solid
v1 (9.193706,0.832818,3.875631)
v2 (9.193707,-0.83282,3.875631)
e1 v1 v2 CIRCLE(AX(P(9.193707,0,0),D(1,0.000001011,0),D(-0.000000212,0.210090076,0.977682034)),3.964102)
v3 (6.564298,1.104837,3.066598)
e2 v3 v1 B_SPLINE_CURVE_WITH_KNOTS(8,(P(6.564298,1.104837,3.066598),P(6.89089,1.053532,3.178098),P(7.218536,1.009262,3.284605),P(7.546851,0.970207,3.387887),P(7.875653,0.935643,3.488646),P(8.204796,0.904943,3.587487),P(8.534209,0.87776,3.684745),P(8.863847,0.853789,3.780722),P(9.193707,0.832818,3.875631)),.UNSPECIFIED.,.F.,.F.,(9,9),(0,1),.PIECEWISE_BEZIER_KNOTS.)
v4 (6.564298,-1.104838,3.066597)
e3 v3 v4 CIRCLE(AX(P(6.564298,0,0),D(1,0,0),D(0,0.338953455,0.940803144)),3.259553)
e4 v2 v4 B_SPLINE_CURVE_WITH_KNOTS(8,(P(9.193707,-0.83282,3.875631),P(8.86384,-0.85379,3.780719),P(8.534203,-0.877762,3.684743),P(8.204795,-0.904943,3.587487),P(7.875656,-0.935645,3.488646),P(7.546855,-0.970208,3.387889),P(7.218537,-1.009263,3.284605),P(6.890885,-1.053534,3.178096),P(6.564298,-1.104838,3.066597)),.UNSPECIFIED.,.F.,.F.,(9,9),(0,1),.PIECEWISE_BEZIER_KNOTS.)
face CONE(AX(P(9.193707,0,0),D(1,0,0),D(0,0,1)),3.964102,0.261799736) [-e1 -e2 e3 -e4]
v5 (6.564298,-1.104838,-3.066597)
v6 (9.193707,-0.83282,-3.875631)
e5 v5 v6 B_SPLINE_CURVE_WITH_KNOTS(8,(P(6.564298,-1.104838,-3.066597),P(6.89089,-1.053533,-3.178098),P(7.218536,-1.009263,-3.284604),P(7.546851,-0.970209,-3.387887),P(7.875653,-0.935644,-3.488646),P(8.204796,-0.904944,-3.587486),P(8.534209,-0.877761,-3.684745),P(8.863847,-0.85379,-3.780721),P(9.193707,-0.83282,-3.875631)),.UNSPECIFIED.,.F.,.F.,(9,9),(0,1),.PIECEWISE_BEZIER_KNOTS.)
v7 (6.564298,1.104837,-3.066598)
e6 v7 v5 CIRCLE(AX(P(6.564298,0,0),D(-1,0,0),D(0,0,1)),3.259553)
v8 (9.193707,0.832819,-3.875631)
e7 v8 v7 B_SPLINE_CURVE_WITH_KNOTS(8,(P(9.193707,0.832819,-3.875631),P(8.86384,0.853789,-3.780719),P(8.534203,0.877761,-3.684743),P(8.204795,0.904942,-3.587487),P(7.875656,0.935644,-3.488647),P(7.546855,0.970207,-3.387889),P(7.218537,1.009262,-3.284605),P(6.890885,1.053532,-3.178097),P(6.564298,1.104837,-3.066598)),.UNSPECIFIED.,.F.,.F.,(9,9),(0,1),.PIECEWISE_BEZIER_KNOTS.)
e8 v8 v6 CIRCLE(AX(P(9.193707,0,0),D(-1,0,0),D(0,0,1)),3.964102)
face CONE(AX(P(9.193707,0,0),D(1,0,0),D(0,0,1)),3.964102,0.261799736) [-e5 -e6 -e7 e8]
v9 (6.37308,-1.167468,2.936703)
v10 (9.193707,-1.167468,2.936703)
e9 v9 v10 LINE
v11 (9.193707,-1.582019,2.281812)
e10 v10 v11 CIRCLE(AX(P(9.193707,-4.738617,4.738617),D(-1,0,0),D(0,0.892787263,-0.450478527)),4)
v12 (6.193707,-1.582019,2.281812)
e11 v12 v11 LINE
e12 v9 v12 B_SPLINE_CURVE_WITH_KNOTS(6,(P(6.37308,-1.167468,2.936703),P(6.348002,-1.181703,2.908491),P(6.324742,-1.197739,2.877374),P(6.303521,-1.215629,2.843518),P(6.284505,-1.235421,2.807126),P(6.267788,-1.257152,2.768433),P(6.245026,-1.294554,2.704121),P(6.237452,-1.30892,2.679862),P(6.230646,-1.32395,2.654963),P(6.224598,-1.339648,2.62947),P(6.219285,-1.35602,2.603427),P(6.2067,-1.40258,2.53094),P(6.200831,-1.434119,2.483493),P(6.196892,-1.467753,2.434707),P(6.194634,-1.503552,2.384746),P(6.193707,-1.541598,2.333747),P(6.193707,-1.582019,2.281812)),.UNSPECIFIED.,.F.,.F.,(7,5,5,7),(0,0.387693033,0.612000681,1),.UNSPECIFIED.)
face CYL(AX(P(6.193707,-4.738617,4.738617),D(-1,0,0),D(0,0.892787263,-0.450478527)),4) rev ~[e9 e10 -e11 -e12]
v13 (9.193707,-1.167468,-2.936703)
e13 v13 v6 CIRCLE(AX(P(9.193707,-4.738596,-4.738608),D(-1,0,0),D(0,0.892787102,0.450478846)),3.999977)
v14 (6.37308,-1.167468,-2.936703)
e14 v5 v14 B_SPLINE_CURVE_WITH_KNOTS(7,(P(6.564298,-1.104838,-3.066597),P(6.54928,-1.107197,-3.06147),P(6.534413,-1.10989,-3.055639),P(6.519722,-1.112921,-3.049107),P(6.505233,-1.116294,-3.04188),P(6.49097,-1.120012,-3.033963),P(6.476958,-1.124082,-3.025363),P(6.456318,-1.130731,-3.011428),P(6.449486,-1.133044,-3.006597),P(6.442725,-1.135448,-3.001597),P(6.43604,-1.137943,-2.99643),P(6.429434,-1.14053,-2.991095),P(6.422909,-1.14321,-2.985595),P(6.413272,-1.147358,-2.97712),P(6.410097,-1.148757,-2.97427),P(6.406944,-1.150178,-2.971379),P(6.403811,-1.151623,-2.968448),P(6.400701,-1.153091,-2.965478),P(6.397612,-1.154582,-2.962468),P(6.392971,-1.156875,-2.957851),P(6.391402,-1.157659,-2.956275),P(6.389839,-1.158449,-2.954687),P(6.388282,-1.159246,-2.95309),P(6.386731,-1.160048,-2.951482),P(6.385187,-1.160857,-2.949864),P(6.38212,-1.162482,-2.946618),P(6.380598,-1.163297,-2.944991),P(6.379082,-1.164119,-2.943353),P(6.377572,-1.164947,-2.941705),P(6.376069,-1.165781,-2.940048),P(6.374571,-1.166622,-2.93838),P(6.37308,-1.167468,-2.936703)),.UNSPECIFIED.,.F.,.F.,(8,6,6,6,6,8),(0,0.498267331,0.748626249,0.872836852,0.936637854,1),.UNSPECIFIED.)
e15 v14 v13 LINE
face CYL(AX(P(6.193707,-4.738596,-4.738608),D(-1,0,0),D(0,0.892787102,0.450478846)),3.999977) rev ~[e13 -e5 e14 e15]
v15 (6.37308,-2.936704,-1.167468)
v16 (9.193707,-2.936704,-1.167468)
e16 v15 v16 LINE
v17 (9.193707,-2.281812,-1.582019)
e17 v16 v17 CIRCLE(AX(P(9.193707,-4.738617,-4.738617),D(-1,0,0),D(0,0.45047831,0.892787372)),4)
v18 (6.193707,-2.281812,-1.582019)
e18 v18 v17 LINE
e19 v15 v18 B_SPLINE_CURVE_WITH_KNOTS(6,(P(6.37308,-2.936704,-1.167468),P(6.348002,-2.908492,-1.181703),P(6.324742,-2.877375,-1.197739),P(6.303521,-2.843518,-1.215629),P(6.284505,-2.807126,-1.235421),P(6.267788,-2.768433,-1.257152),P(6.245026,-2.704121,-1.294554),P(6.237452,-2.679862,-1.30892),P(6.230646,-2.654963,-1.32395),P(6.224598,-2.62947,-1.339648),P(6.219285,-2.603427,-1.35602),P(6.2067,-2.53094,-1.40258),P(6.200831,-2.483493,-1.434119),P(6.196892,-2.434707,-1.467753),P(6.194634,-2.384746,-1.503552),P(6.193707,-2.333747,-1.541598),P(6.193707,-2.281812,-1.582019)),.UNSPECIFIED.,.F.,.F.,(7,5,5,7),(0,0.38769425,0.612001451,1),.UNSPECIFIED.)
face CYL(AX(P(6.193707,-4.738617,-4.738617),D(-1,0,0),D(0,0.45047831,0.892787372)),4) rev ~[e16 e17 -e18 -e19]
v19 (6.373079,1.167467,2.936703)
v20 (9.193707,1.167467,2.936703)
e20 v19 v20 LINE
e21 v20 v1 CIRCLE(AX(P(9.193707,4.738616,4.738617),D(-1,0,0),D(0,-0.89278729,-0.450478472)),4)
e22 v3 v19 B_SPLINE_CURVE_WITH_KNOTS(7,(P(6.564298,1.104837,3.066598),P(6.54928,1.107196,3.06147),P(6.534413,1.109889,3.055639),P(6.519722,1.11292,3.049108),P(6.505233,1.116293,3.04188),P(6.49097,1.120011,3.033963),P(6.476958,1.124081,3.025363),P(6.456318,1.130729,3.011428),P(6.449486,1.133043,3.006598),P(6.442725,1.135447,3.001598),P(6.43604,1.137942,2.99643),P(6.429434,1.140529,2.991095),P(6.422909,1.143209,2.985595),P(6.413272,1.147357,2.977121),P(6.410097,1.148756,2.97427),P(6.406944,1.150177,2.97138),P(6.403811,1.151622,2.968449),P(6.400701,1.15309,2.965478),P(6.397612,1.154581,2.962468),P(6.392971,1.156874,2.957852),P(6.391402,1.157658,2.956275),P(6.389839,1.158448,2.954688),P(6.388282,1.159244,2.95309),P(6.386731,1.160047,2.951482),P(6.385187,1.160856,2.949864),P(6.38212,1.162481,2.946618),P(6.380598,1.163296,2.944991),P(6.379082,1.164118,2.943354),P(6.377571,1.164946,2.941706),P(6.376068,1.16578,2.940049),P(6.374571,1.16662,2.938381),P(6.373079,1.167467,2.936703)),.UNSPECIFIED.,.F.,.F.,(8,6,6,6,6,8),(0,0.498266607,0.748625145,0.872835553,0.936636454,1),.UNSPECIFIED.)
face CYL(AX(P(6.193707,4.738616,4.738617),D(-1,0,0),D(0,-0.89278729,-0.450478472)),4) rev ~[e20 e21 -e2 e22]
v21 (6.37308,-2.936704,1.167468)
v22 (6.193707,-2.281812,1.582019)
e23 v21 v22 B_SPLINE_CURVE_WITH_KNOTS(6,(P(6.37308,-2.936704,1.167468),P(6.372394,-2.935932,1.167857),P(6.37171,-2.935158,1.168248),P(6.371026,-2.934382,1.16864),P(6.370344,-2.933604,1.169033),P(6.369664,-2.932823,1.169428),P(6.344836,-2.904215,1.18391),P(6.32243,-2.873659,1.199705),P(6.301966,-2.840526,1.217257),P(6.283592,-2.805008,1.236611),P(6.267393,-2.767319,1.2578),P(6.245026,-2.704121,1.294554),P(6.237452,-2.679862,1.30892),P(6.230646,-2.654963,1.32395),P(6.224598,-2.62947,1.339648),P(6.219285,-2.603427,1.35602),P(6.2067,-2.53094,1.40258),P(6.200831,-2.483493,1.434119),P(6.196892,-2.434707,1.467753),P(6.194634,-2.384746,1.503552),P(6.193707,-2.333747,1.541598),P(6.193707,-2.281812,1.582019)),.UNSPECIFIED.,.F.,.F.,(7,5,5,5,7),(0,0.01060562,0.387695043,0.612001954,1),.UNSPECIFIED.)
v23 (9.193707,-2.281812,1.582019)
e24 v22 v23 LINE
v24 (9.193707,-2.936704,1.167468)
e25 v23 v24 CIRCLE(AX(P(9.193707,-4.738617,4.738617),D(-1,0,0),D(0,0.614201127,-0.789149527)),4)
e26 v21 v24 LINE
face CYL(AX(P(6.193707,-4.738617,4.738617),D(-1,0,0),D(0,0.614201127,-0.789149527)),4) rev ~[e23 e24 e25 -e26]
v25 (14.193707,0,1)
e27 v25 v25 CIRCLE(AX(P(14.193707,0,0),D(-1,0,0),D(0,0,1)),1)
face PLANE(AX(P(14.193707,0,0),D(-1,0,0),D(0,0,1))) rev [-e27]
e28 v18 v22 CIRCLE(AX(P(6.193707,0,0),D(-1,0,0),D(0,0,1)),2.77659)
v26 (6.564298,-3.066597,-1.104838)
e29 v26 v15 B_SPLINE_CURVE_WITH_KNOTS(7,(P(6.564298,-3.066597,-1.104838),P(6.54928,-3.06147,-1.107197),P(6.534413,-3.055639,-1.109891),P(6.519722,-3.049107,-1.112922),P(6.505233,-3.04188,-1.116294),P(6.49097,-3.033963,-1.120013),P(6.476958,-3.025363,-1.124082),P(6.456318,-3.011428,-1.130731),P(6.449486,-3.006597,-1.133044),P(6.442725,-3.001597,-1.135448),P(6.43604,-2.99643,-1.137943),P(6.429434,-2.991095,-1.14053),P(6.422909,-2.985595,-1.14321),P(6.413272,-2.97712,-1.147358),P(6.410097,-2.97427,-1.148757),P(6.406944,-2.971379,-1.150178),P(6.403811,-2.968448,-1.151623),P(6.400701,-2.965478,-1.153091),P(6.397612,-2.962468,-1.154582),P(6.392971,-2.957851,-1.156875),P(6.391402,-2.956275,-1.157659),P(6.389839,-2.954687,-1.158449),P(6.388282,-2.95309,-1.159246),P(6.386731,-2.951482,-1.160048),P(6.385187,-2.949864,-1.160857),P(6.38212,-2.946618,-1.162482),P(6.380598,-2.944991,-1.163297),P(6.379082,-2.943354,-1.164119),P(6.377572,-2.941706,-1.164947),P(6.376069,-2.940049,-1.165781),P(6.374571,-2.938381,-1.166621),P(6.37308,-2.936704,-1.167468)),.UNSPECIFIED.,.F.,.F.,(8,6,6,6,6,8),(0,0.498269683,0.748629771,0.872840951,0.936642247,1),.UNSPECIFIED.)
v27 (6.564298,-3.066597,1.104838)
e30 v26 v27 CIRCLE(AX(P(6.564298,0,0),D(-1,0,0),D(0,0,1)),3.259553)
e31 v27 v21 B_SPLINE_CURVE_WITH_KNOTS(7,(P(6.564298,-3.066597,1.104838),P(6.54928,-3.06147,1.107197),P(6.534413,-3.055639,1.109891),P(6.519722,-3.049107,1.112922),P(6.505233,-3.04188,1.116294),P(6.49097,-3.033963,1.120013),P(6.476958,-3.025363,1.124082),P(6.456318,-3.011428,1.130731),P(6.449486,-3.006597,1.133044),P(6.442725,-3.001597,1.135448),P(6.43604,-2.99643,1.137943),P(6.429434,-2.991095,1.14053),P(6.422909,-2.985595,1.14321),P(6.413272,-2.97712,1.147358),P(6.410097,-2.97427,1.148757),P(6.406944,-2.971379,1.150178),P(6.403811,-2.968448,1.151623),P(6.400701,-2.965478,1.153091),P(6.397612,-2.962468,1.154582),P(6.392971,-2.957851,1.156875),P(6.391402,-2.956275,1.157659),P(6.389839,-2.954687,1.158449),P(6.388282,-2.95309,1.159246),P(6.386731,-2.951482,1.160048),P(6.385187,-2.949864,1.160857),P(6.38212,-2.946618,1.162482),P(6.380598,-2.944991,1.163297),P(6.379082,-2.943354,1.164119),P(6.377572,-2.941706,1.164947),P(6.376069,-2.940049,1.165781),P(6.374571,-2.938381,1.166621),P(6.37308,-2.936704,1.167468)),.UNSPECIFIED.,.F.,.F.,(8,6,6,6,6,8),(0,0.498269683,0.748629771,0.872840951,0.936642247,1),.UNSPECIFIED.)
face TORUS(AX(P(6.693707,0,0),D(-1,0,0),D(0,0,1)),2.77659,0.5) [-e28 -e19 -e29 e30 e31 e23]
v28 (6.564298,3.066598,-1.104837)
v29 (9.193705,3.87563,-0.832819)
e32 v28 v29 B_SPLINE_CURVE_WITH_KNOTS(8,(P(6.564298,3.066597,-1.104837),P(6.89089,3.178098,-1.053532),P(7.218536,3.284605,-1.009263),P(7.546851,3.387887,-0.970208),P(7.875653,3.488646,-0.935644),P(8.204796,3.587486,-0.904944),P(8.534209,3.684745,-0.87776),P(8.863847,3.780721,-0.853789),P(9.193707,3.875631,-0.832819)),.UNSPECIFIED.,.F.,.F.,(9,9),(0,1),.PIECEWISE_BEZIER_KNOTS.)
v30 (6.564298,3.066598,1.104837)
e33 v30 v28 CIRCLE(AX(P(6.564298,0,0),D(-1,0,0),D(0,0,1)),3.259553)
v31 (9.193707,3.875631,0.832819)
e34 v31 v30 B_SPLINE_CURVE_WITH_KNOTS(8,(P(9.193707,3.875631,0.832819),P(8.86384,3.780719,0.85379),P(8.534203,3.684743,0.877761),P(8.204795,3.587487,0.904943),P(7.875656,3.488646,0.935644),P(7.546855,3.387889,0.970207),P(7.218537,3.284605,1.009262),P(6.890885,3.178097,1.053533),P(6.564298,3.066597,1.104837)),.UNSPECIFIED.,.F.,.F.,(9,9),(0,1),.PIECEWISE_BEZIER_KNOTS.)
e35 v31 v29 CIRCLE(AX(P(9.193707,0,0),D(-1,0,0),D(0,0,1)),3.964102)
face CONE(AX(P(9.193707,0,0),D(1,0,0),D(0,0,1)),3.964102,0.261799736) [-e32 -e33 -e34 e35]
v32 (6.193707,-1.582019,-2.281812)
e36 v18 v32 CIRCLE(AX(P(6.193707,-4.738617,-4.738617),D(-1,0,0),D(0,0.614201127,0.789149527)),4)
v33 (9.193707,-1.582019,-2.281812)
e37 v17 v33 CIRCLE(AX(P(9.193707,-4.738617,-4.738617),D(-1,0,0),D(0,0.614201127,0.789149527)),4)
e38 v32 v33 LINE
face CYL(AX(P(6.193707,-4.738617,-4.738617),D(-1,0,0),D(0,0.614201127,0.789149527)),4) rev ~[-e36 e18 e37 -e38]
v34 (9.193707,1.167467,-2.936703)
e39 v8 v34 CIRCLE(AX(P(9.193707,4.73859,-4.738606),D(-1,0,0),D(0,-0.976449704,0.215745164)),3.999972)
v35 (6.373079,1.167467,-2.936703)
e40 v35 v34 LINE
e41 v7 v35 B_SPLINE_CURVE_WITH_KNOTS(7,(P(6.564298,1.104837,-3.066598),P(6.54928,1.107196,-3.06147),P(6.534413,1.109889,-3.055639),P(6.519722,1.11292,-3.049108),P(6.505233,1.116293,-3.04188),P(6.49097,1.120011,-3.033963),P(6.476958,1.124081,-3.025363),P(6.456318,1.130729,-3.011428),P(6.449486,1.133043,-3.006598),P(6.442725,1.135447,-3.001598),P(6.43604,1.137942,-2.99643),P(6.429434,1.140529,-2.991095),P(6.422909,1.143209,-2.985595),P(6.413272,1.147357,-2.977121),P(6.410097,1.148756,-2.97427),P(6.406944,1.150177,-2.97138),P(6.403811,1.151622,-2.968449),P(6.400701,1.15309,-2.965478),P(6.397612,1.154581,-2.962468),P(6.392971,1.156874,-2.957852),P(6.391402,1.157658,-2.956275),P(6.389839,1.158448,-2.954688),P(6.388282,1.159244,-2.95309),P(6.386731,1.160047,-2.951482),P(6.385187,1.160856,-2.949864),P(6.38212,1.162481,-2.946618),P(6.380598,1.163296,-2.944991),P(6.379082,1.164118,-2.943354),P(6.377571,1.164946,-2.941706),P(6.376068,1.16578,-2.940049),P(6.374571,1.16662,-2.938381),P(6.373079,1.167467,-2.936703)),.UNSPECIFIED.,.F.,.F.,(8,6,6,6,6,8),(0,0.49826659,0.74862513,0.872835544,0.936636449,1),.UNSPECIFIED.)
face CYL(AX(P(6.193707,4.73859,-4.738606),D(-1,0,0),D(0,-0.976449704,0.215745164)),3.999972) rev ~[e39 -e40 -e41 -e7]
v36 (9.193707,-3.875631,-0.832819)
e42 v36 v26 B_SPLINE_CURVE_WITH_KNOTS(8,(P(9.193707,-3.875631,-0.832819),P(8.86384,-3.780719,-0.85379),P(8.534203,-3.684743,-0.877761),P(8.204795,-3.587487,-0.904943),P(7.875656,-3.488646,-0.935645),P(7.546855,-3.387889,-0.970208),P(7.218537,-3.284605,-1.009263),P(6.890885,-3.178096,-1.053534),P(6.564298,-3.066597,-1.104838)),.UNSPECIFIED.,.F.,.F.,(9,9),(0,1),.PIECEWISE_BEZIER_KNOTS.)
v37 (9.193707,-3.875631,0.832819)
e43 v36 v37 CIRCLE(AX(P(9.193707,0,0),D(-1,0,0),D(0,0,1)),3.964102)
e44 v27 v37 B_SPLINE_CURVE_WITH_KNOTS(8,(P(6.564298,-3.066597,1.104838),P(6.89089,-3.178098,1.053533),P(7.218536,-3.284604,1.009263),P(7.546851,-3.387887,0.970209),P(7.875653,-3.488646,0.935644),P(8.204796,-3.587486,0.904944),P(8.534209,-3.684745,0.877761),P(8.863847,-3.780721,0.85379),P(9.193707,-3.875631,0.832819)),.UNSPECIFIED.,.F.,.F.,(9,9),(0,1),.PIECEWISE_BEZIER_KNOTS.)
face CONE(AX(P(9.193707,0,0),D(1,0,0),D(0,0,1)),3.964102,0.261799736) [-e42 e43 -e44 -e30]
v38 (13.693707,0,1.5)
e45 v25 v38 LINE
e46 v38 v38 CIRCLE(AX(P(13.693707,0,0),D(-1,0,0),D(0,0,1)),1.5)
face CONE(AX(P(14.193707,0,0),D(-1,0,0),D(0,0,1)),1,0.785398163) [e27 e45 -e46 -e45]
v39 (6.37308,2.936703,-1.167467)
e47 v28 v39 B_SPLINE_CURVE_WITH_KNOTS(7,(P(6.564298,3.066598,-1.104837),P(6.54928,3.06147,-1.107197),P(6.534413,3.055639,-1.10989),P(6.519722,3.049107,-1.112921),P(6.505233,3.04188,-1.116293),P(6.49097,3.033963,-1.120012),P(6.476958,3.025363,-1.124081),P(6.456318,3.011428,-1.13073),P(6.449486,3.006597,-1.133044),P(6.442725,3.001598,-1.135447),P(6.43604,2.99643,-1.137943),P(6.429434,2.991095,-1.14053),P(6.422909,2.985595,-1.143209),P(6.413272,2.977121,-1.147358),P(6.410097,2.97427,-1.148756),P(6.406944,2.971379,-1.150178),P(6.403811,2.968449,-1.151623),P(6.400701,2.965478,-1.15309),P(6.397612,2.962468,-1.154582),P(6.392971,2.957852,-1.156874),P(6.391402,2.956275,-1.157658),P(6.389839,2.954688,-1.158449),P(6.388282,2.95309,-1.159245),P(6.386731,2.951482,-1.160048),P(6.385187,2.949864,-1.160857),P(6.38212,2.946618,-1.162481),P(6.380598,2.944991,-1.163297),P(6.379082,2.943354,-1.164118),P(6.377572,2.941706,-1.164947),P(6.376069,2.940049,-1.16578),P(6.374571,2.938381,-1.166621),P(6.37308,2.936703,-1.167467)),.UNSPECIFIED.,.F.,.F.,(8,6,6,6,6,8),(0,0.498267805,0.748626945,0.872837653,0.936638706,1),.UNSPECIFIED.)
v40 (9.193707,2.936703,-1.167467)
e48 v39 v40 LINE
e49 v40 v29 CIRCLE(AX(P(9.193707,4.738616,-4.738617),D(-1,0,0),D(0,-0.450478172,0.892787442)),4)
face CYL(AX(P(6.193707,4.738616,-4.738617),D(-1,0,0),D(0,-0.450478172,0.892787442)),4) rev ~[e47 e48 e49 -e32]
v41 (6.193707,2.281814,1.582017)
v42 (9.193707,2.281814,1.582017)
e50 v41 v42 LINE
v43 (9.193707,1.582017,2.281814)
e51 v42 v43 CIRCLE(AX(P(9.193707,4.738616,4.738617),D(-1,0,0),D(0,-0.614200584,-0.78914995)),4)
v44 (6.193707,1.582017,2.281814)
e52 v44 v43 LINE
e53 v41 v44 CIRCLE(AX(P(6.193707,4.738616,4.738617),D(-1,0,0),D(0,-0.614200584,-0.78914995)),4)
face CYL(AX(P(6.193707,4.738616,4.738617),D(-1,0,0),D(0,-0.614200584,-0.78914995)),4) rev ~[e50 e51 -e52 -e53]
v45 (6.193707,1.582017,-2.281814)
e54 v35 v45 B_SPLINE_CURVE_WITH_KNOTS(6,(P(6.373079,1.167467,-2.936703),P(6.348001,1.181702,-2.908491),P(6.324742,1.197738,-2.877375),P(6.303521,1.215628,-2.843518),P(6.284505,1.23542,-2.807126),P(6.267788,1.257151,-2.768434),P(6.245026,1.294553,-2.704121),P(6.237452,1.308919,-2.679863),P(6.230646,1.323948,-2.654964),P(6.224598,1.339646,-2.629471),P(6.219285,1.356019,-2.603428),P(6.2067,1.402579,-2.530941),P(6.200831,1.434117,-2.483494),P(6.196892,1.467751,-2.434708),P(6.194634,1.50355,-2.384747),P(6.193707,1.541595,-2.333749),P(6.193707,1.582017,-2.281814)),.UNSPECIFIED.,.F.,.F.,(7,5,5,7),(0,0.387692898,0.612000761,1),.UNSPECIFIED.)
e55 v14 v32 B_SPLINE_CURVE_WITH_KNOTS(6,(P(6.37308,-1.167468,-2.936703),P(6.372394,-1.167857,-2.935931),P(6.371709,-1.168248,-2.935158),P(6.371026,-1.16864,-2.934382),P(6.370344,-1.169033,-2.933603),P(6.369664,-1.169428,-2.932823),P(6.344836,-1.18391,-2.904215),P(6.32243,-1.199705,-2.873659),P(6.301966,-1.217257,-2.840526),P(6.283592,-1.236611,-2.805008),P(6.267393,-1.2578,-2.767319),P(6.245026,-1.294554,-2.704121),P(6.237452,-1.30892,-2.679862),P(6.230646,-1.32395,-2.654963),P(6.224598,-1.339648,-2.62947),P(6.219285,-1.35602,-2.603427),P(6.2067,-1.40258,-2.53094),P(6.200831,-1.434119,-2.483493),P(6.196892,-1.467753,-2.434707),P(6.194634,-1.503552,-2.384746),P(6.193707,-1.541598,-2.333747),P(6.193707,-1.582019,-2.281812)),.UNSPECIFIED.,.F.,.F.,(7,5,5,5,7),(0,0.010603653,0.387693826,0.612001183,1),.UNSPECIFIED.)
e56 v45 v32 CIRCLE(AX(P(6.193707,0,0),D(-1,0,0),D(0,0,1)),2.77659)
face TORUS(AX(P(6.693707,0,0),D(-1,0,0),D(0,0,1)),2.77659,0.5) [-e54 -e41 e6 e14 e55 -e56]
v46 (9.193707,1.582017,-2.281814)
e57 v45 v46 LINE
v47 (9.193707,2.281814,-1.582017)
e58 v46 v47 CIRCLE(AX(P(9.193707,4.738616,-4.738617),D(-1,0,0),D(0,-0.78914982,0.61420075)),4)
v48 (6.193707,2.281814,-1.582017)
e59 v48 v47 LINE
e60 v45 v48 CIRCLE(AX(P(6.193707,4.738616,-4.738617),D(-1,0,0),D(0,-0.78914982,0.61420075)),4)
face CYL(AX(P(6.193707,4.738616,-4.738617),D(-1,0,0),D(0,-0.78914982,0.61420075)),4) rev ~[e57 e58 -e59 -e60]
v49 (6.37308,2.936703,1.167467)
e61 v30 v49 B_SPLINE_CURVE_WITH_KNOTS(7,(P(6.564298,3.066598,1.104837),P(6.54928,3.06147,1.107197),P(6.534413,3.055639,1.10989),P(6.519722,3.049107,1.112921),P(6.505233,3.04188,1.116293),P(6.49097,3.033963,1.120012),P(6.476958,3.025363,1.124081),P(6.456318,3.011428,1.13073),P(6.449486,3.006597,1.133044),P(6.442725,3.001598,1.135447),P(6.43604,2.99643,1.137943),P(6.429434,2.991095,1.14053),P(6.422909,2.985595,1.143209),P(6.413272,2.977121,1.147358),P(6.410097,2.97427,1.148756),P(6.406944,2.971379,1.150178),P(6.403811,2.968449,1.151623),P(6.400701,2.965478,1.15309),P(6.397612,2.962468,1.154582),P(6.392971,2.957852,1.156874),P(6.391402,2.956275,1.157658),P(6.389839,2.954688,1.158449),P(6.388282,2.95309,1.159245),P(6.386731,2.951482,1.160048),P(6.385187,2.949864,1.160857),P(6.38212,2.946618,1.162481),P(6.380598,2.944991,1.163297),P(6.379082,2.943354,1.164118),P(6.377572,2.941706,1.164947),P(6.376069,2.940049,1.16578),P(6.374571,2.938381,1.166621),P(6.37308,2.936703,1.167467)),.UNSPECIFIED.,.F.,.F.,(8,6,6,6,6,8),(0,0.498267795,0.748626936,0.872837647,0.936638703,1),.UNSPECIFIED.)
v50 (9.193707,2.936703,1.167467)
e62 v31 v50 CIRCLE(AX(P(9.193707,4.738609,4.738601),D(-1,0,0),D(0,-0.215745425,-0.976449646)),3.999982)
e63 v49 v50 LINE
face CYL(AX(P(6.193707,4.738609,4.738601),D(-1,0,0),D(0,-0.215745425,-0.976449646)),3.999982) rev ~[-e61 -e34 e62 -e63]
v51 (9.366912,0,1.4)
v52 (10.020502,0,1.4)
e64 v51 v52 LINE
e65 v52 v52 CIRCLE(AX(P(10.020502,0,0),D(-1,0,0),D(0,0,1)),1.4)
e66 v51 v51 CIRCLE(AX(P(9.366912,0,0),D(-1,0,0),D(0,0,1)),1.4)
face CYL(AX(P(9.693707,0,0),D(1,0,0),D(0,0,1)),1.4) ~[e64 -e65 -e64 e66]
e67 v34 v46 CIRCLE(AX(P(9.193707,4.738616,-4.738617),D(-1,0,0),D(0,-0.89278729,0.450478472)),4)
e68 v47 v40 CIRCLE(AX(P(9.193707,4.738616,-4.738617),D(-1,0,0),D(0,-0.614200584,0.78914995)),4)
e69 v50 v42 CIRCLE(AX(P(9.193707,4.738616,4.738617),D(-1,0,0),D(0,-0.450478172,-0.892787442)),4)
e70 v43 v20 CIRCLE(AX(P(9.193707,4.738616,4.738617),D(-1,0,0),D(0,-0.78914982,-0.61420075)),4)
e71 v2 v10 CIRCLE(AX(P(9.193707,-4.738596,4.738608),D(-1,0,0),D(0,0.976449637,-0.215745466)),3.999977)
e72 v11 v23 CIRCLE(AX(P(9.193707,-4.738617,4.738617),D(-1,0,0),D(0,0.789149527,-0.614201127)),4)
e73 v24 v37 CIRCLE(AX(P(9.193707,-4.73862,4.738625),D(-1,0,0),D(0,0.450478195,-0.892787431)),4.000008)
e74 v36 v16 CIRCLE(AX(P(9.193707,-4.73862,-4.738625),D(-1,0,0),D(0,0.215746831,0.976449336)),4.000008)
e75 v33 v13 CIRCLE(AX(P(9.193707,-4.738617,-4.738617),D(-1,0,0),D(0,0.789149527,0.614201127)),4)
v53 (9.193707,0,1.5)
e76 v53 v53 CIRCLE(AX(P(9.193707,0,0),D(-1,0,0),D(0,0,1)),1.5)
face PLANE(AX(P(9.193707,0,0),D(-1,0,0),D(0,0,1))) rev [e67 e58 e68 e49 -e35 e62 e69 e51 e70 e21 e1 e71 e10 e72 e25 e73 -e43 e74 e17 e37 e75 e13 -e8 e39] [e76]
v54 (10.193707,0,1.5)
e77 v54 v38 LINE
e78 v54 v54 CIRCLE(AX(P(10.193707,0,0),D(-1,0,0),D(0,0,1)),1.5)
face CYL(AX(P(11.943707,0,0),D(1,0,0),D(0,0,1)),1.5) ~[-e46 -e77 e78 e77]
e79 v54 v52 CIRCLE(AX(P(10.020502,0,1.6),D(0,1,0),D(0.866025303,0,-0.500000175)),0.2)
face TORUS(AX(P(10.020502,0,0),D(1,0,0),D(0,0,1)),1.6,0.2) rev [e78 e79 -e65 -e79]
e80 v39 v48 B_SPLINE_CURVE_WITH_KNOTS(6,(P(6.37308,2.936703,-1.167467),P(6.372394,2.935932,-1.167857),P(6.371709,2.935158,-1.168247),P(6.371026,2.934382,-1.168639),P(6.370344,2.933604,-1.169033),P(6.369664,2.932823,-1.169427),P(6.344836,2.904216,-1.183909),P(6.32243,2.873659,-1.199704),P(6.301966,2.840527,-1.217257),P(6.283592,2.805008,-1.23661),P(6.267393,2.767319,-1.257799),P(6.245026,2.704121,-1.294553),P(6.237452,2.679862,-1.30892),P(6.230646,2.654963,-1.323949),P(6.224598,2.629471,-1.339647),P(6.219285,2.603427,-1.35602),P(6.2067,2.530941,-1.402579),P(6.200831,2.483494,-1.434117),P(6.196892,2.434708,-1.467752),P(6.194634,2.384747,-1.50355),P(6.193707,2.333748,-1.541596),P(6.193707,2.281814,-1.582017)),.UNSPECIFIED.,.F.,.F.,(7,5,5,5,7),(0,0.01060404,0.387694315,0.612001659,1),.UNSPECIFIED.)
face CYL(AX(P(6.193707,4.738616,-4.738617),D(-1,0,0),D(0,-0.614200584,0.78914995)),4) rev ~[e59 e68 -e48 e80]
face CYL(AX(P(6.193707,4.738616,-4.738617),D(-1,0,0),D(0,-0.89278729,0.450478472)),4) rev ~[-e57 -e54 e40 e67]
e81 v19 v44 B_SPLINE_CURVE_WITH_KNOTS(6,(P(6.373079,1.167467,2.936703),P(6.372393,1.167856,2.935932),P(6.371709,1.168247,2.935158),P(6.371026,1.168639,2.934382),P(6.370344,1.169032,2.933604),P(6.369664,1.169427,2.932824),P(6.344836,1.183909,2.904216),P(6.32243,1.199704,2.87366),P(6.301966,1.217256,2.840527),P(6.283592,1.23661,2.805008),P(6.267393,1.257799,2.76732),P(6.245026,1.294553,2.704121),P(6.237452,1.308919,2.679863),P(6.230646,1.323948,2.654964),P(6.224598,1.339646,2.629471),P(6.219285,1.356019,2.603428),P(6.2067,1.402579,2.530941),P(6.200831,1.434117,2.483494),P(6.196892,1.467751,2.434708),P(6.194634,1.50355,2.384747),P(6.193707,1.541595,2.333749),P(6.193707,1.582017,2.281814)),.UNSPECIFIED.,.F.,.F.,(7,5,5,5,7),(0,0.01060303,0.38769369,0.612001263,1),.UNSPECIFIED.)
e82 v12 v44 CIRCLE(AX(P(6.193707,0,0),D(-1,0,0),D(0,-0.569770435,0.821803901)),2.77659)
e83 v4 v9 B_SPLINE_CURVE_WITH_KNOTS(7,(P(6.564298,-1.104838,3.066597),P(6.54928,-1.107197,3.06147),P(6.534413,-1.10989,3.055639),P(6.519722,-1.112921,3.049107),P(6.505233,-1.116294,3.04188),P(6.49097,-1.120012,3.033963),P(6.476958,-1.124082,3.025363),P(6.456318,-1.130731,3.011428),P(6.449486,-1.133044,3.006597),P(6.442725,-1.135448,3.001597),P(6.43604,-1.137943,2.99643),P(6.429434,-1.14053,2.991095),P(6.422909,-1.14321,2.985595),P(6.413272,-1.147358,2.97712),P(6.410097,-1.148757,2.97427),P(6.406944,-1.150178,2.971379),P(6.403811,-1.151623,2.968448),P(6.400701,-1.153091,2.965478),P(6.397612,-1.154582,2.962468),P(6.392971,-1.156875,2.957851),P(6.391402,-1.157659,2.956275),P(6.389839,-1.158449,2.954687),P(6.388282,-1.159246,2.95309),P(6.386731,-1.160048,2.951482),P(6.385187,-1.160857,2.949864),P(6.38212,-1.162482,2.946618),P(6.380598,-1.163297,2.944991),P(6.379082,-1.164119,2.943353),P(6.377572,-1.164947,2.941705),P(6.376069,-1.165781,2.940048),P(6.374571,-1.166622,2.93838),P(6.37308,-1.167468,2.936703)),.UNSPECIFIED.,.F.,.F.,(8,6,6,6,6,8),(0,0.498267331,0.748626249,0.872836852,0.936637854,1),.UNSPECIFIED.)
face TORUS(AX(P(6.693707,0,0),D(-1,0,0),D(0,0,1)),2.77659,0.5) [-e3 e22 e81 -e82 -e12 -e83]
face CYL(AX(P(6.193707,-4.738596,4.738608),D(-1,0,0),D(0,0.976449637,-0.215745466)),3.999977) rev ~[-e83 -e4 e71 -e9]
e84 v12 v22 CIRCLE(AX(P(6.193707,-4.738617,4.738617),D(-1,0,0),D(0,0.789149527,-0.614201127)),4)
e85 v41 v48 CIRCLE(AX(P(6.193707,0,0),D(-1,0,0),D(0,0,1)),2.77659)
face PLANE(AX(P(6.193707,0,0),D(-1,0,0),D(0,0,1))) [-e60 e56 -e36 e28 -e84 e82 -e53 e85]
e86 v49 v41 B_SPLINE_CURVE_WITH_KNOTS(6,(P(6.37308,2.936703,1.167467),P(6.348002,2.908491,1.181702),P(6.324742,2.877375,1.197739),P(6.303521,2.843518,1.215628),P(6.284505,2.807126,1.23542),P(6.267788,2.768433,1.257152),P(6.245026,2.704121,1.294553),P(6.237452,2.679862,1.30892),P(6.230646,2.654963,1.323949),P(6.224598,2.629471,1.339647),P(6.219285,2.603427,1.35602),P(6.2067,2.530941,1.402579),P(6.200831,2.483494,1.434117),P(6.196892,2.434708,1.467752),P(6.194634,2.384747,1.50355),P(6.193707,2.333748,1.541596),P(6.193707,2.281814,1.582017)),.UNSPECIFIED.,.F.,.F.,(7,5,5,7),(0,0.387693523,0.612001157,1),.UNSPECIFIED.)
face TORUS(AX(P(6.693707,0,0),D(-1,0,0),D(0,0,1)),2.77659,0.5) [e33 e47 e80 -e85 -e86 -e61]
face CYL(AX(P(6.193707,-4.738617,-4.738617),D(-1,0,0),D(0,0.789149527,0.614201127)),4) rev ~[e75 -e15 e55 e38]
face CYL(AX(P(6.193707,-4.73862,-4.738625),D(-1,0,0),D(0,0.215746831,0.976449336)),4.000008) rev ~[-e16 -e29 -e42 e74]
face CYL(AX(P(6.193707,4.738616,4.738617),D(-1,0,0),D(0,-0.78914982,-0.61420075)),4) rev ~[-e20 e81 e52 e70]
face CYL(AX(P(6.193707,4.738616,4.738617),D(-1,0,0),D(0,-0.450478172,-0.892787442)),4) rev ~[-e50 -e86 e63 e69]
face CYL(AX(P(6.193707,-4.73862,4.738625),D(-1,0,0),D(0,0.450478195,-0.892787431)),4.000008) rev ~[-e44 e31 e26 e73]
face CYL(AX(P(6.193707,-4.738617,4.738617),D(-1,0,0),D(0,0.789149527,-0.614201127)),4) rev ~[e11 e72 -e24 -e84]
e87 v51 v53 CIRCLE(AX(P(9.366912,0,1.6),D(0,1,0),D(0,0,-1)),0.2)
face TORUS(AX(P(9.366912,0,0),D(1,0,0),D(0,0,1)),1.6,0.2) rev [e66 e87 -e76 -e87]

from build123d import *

# Parameters (mm, degrees)
F0_W     = 0.65359
F0_H     = 1.4
F0_W_2   = 3.5
F0_H_2   = 1.5
F3_DEPTH = 25


# Not quite as in the source:
# - ends of sketch curves that miss each other by under 0.0002 mm in the source are joined


with BuildPart() as f1:
    # F0 (on Front) → F1 (revolve)
    with BuildSketch(Plane.XZ):
        with BuildLine():
            ThreePointArc((9.366912, 1.4), (9.2669120175, 1.4267949091), (9.1937069394, 1.499999965))
            Line((9.193707, 1.499999965), (9.193707, 0))
            Line((9.193707, 0), (9.366912, 0))
            Line((9.366912, 0), (9.366912, 1.4))
        make_face()
        with Locations((9.693707, 0.7)):
            Rectangle(F0_W, F0_H)
        with BuildLine():
            ThreePointArc((10.1937070606, 1.499999965), (10.1205019825, 1.4267949091), (10.020502, 1.4))
            Line((10.020502, 1.4), (10.020502, 0))
            Line((10.020502, 0), (10.193707, 0))
            Line((10.193707, 0), (10.193707, 1.5))
        make_face()
        with Locations((11.943707, 0.75)):
            Rectangle(F0_W_2, F0_H_2)
        Polygon((14.193707, 1), (13.693707, 1.5), (13.693707, 0), (14.193707, 0), align=None)
        with BuildLine():
            Line((9.193707, 3.964102), (6.564298, 3.259553))
            ThreePointArc((6.5642979867, 3.2595530496), (6.2970304903, 3.0809709236), (6.193707, 2.77659))
            Line((6.193707, 2.77659), (6.193707, 0))
            Line((6.193707, 0), (9.193707, 0))
            Line((9.193707, 0), (9.193707, 1.499999965))
            Line((9.193707, 1.499999965), (9.193707, 3.964102))
        make_face()
    revolve(axis=Axis((10.368707, 0, 0), (-1, 0, 0)))

    # F2 (on face) → F3 (cut)
    with BuildSketch(Plane(origin=(6.193707, 0, 0), x_dir=(0, -1, 0), z_dir=(-1, 0, 0))):
        with BuildLine():
            ThreePointArc((3.8756311548, 0.8328191991), (2.8030435942, 2.8030432168), (0.8328197209, 3.8756310427))
            ThreePointArc((0.8328197209, 3.8756310427), (0.9707821759, 3.3957019848), (1.1674679485, 2.9367028921))
            ThreePointArc((1.1674679485, 2.9367028921), (1.3588439576, 2.5991932034), (1.5820188923, 2.2818124929))
            ThreePointArc((1.5820188923, 2.2818124929), (1.9633456176, 1.9633456176), (2.2818124929, 1.5820188923))
            ThreePointArc((2.2818124929, 1.5820188923), (2.599193614, 1.3588436976), (2.9367037599, 1.1674675107))
            ThreePointArc((2.9367037599, 1.1674675107), (3.3957025442, 0.9707819765), (3.8756311548, 0.8328191991))
        make_face()
        with BuildLine():
            ThreePointArc((-1.1674668381, 2.9367031109), (-0.9707811347, 3.3957021002), (-0.8328183948, 3.8756308663))
            ThreePointArc((-0.8328183948, 3.8756308663), (-2.8030431743, 2.8030436368), (-3.8756311107, 0.8328194045))
            ThreePointArc((-3.8756311107, 0.8328194045), (-3.3957018345, 0.970781873), (-2.9367033101, 1.167467233))
            ThreePointArc((-2.9367033101, 1.167467233), (-2.5991940372, 1.3588427967), (-2.281813665, 1.5820172017))
            ThreePointArc((-2.281813665, 1.5820172017), (-1.9633454104, 1.9633458247), (-1.5820167202, 2.2818139988))
            ThreePointArc((-1.5820167202, 2.2818139988), (-1.3588423817, 2.5991941131), (-1.1674668381, 2.9367031109))
        make_face()
        with BuildLine():
            ThreePointArc((2.2818124929, 1.5820188923), (1.9633456176, 1.9633456176), (1.5820188923, 2.2818124929))
            ThreePointArc((1.5820188923, 2.2818124929), (1.9101898753, 1.9101898753), (2.2818124929, 1.5820188923))
        make_face()
        with BuildLine():
            ThreePointArc((-2.281813665, 1.5820172017), (-1.9101891737, 1.9101895768), (-1.5820167202, 2.2818139988))
            ThreePointArc((-1.5820167202, 2.2818139988), (-1.9633454104, 1.9633458247), (-2.281813665, 1.5820172017))
        make_face()
        with BuildLine():
            ThreePointArc((-2.9367033101, -1.167467233), (-3.3957018345, -0.970781873), (-3.8756300769, -0.8328193482))
            ThreePointArc((-3.8756300769, -0.8328193482), (-2.8030431743, -2.8030436368), (-0.8328187651, -3.8756312481))
            ThreePointArc((-0.8328187651, -3.8756312481), (-0.9707811347, -3.3957021002), (-1.1674668381, -2.9367031109))
            ThreePointArc((-1.1674668381, -2.9367031109), (-1.3588423817, -2.5991941131), (-1.5820167202, -2.2818139988))
            ThreePointArc((-1.5820167202, -2.2818139988), (-1.9633454104, -1.9633458247), (-2.281813665, -1.5820172017))
            ThreePointArc((-2.281813665, -1.5820172017), (-2.5991940372, -1.3588427967), (-2.9367033101, -1.167467233))
        make_face()
        with BuildLine():
            ThreePointArc((0.8328197209, -3.8756310427), (2.8030435942, -2.8030432168), (3.8756311548, -0.8328191991))
            ThreePointArc((3.8756311548, -0.8328191991), (3.3957025442, -0.9707819765), (2.9367037599, -1.1674675107))
            ThreePointArc((2.9367037599, -1.1674675107), (2.599193614, -1.3588436976), (2.2818124929, -1.5820188923))
            ThreePointArc((2.2818124929, -1.5820188923), (1.9633456176, -1.9633456176), (1.5820188923, -2.2818124929))
            ThreePointArc((1.5820188923, -2.2818124929), (1.3588439576, -2.5991932034), (1.1674679485, -2.9367028921))
            ThreePointArc((1.1674679485, -2.9367028921), (0.9707821759, -3.3957019848), (0.8328197209, -3.8756310427))
        make_face()
        with BuildLine():
            ThreePointArc((1.5820188923, -2.2818124929), (1.9633456176, -1.9633456176), (2.2818124929, -1.5820188923))
            ThreePointArc((2.2818124929, -1.5820188923), (1.9101898753, -1.9101898753), (1.5820188923, -2.2818124929))
        make_face()
        with BuildLine():
            ThreePointArc((-1.5820167202, -2.2818139988), (-1.9101891737, -1.9101895768), (-2.281813665, -1.5820172017))
            ThreePointArc((-2.281813665, -1.5820172017), (-1.9633454104, -1.9633458247), (-1.5820167202, -2.2818139988))
        make_face()
    extrude(amount=-F3_DEPTH, mode=Mode.SUBTRACT)


solid = f1.part
